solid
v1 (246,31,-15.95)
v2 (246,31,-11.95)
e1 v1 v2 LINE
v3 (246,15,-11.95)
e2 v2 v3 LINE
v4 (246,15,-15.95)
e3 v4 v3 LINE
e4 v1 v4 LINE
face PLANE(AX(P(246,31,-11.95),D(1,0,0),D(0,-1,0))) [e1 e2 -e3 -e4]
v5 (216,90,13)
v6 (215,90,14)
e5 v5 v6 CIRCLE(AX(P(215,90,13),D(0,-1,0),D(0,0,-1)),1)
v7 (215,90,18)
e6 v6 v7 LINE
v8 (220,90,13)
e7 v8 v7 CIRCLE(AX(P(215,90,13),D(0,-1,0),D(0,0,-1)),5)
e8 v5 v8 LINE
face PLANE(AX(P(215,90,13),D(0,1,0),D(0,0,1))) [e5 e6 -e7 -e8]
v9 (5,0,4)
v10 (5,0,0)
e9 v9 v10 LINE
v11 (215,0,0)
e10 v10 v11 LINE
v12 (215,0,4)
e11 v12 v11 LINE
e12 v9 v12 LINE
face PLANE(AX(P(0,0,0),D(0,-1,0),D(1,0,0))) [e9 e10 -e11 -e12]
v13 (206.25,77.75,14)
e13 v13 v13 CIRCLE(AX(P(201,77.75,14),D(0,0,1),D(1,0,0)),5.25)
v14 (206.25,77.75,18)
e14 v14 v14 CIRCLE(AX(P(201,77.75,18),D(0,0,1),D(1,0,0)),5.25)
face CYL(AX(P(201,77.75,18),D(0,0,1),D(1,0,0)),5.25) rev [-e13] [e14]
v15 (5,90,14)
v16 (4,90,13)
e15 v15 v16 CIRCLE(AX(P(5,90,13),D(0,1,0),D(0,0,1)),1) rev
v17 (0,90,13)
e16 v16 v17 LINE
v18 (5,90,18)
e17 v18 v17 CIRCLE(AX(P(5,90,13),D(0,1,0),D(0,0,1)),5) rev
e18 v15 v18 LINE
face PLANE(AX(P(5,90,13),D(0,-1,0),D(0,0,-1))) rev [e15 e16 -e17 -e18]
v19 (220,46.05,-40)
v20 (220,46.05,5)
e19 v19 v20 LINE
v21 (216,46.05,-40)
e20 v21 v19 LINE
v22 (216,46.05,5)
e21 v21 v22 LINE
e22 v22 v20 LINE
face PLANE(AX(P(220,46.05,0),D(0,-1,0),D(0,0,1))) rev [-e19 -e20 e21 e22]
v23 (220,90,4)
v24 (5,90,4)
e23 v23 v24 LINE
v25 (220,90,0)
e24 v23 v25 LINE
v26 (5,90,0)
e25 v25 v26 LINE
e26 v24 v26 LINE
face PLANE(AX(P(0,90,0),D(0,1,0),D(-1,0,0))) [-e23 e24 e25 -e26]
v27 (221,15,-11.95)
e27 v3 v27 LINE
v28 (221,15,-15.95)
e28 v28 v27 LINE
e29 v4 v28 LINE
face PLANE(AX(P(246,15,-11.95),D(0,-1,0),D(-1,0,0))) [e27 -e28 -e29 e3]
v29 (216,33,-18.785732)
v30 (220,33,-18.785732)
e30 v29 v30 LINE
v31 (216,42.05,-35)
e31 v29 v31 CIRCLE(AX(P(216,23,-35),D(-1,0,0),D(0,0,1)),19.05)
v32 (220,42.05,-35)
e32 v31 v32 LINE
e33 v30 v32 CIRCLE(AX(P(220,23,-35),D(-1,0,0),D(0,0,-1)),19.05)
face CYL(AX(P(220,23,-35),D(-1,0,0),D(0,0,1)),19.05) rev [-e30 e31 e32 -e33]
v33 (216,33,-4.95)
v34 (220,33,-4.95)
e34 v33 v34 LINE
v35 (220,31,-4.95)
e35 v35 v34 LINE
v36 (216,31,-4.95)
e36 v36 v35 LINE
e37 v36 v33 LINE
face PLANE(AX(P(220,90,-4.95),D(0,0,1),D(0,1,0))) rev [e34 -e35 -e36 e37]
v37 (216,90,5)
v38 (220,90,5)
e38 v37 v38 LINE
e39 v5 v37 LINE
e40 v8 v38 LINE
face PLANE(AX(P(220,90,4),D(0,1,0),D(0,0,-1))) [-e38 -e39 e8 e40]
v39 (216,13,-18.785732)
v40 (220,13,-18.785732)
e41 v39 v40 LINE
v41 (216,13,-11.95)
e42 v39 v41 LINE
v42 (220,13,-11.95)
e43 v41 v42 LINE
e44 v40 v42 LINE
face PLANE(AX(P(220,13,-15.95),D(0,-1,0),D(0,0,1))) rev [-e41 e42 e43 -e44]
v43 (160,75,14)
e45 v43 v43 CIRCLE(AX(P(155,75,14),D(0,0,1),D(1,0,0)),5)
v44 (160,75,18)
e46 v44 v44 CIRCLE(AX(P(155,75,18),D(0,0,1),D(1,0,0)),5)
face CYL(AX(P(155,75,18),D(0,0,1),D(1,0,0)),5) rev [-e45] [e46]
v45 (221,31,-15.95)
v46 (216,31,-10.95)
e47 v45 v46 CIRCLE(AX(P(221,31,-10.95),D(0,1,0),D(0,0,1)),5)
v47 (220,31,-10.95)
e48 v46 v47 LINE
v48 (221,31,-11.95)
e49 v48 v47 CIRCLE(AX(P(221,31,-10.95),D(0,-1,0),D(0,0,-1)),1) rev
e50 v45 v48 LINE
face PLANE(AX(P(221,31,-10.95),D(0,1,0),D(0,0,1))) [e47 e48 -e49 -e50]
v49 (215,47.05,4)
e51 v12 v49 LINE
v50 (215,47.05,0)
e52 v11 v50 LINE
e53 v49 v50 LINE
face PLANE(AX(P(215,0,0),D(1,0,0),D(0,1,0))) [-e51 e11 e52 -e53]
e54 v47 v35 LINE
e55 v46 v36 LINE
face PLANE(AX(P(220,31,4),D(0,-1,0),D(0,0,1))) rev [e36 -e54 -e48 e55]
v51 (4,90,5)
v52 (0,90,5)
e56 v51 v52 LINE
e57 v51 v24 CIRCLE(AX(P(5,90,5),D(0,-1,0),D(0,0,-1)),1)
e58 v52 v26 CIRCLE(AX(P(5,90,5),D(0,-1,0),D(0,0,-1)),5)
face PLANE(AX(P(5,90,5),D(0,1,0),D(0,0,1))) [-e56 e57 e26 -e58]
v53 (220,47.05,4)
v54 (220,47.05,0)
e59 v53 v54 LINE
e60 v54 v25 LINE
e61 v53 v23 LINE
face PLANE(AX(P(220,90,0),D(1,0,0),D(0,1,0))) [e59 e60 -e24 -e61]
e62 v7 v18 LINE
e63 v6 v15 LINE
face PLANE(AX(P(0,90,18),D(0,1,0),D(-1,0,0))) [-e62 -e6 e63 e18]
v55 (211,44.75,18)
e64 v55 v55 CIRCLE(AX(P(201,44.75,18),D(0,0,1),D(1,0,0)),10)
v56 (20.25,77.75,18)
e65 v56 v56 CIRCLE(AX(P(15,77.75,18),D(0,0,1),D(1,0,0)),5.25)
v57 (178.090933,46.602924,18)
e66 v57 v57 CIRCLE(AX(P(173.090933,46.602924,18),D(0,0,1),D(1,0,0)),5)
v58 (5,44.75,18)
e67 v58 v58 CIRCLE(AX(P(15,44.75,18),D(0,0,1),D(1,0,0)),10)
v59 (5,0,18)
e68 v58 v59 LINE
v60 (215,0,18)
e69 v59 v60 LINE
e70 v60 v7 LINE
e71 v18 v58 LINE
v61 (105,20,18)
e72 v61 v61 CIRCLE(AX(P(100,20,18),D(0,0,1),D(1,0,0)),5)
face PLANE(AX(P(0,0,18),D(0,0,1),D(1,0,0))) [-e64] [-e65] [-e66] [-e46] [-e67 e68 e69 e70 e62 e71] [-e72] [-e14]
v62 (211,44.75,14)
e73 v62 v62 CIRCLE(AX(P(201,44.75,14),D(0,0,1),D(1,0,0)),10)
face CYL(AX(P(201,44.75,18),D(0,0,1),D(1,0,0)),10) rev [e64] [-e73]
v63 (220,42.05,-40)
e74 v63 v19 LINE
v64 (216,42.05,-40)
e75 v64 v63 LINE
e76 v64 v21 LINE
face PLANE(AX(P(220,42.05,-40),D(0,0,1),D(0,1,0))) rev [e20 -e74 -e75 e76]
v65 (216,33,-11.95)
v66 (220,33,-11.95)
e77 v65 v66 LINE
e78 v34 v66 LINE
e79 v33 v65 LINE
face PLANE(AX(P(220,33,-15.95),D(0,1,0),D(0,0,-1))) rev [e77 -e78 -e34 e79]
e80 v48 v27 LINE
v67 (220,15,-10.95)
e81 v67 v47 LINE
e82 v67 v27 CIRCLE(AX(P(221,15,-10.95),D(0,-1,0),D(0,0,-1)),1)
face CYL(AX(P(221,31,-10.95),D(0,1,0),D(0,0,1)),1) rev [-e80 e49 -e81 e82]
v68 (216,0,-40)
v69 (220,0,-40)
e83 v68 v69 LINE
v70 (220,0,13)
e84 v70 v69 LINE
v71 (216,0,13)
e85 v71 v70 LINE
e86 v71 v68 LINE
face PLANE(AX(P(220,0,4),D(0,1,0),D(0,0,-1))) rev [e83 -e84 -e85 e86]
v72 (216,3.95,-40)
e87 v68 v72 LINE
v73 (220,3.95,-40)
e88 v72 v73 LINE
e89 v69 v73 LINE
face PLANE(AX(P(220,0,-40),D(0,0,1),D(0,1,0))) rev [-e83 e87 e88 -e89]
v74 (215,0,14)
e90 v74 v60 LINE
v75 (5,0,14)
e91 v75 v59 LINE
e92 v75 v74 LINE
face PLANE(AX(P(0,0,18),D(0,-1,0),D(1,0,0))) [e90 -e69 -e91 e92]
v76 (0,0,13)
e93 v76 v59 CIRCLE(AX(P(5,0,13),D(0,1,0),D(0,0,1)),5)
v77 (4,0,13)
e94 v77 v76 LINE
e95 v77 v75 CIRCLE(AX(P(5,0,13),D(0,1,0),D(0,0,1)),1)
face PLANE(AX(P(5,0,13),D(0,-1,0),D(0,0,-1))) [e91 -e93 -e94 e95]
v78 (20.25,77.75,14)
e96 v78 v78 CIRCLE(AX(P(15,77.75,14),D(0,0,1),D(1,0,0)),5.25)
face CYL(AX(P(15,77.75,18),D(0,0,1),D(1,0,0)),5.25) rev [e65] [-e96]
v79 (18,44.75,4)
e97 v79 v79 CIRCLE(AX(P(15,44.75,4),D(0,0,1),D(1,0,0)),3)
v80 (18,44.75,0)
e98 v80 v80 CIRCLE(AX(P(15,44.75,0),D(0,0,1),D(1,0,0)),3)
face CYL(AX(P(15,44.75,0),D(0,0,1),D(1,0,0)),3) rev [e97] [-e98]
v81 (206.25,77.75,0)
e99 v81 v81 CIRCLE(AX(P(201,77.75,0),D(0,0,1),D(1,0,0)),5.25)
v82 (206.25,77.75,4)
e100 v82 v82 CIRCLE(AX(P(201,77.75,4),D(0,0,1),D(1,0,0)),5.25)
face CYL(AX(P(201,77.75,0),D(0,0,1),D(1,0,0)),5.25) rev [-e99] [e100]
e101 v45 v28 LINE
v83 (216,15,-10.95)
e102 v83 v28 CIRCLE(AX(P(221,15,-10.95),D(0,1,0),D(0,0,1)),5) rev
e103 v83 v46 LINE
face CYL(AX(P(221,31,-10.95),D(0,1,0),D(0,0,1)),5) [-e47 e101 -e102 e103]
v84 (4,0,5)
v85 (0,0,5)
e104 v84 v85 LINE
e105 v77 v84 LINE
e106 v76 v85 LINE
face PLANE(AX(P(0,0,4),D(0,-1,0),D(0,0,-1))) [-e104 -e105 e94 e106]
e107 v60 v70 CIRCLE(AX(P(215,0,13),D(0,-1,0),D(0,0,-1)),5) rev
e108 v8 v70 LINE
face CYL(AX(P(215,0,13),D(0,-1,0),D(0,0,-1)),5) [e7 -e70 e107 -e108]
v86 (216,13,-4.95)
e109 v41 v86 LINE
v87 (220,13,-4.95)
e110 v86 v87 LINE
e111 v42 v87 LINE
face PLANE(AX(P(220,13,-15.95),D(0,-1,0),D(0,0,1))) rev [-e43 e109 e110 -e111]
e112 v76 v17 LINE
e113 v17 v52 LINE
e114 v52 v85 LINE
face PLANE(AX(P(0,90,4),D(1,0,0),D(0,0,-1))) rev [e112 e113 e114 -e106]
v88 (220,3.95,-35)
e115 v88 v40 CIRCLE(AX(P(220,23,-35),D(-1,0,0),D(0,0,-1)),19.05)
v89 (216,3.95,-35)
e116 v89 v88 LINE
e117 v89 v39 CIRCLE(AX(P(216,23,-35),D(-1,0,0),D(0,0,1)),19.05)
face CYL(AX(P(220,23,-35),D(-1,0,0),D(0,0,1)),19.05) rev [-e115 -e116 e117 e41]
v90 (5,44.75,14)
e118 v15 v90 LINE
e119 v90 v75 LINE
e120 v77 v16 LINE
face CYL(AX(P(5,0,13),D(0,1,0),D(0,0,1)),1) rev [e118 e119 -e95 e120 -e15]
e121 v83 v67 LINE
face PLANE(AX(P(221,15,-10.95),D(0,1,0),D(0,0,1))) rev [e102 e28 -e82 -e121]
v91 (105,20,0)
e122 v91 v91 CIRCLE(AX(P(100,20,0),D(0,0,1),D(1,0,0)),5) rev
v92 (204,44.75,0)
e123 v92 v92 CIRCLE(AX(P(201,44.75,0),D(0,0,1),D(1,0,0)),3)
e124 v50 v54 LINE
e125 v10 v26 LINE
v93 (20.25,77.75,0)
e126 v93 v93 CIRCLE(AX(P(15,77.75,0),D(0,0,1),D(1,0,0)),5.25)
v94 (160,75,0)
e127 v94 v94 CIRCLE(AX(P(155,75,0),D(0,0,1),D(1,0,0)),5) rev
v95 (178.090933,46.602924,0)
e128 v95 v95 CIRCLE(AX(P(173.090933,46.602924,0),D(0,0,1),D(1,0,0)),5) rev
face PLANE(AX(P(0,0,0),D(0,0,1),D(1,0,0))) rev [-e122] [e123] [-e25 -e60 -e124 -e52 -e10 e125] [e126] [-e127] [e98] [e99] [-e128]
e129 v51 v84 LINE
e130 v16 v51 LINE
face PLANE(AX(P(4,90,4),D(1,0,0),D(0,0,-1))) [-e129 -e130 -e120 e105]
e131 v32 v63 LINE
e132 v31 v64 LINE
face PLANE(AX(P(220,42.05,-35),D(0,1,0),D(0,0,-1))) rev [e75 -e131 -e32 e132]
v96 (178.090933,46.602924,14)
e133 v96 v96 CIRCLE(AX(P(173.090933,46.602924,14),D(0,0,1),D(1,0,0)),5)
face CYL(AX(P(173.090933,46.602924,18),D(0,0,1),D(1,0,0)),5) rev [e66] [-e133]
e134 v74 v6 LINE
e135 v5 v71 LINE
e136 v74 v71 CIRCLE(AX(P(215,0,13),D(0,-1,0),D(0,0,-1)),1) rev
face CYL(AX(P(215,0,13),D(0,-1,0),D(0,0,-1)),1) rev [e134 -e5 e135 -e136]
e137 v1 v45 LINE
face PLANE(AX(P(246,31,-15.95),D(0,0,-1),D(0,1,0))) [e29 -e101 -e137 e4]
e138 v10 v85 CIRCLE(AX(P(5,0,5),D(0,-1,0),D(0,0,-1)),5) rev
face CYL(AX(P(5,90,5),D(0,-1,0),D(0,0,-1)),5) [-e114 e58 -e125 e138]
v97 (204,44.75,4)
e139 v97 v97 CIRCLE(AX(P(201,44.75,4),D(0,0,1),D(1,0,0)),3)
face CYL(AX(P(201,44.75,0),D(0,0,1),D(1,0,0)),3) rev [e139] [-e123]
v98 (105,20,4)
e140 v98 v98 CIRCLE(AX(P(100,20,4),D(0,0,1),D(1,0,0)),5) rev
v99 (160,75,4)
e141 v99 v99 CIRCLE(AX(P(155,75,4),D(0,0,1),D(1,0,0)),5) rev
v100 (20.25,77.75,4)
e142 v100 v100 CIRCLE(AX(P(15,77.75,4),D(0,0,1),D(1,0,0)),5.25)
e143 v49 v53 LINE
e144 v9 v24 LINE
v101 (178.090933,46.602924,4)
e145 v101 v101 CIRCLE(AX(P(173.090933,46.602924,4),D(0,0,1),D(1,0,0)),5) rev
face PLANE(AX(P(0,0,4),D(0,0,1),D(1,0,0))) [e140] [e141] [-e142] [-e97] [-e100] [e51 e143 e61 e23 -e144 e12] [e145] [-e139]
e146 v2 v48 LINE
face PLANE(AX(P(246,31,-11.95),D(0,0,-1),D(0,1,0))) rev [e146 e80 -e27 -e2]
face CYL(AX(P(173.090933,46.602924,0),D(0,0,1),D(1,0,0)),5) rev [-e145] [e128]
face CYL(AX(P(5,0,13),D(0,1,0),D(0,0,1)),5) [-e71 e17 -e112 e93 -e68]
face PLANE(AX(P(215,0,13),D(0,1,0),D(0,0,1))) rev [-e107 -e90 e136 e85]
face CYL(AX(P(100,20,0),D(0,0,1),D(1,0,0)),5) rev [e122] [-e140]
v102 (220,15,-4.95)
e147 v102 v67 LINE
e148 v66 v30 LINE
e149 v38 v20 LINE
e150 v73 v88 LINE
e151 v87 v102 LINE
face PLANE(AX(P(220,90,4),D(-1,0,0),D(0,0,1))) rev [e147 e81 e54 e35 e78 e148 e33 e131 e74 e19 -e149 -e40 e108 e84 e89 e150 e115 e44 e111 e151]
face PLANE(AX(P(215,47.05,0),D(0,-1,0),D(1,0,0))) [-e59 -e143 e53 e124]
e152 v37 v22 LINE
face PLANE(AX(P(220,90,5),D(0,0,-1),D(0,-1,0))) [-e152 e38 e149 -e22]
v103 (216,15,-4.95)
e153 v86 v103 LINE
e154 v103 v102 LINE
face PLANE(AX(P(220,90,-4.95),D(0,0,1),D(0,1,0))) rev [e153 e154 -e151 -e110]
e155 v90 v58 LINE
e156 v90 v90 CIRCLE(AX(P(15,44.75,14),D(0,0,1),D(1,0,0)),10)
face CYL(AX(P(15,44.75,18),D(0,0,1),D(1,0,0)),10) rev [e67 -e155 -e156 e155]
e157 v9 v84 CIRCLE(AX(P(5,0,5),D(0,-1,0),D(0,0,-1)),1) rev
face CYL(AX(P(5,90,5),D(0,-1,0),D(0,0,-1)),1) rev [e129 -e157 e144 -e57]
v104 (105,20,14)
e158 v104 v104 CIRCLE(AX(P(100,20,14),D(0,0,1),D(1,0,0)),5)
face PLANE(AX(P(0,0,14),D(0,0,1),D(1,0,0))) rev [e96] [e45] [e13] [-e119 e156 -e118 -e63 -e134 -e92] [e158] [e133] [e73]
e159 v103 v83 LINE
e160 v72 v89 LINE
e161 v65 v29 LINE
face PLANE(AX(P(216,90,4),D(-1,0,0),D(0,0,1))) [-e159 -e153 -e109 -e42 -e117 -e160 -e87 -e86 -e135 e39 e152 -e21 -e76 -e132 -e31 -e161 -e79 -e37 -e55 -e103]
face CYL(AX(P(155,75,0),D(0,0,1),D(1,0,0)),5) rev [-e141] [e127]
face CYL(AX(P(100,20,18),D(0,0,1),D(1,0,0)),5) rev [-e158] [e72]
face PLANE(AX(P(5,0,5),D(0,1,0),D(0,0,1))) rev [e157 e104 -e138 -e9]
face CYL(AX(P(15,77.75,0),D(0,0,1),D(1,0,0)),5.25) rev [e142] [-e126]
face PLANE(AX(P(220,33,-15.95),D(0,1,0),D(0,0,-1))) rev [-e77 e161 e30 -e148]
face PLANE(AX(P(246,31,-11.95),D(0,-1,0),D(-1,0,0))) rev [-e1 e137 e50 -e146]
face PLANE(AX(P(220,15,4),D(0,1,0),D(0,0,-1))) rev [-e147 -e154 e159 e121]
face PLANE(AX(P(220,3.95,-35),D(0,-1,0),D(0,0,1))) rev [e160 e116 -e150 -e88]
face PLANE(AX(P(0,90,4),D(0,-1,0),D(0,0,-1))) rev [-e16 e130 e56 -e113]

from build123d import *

# Parameters (mm, degrees)
SKETCH1_W              = 220
SKETCH1_H              = 90
SKETCH1_R              = 3
SKETCH1_R_2            = 5.25
BOSS_EXTRUDE1_DEPTH    = 4
SKETCH3_W              = 4
SKETCH3_H              = 90
BOSS_EXTRUDE2_DEPTH    = 10
SKETCH21_W             = 220
SKETCH21_H             = 90
SKETCH21_R             = 5.25
SKETCH21_R_2           = 10
SKETCH21_R_3           = 5
BOSS_EXTRUDE3_DEPTH    = 4
CUT_EXTRUDE4_REACH     = 240.109
SKETCH35_R             = 5
BOSS_EXTRUDE6_DEPTH    = 4
SKETCH33_W             = 1
SKETCH33_H             = 43.95
CUT_EXTRUDE2_DEPTH     = 4
CUT_EXTRUDE3_DEPTH     = 4
SKETCH41_W             = 4
SKETCH41_H             = 16
BOSS_EXTRUDE8_DEPTH    = 26
CONVERT_SOLID4_DEPTH   = 90
CONVERT_SOLID4_START   = 13
CONVERT_SOLID4_2_DEPTH = 20
CONVERT_SOLID4_3_DEPTH = 2
CONVERT_SOLID4_START_2 = 31
CONVERT_SOLID4_4_DEPTH = 2
CONVERT_SOLID4_5_DEPTH = 90
CONVERT_SOLID4_START_3 = 15
CONVERT_SOLID4_6_DEPTH = 16


# Read off the part's stored shape, not the designer's step: Convert-Solid4
with BuildPart() as part:
    # Sketch1 → Boss-Extrude1 (new body)
    with BuildSketch(Plane.XY):
        with Locations((110, 45)):
            Rectangle(SKETCH1_W, SKETCH1_H)
        with Locations((201, 44.75)):
            Circle(SKETCH1_R, mode=Mode.SUBTRACT)
        with Locations((201, 77.75)):
            Circle(SKETCH1_R_2, mode=Mode.SUBTRACT)
        with Locations((15, 44.75)):
            Circle(SKETCH1_R, mode=Mode.SUBTRACT)
        with Locations((15, 77.75)):
            Circle(SKETCH1_R_2, mode=Mode.SUBTRACT)
    extrude(amount=BOSS_EXTRUDE1_DEPTH)

    # Sketch3 → Boss-Extrude2 (add)
    with BuildSketch(Plane.XY.offset(4)):
        with Locations((2, 45)):
            Rectangle(SKETCH3_W, SKETCH3_H)
        with Locations((218, 45)):
            Rectangle(SKETCH3_W, SKETCH3_H)
    extrude(amount=BOSS_EXTRUDE2_DEPTH)

    # Sketch21 → Boss-Extrude3 (add)
    with BuildSketch(Plane.XY.offset(14)):
        with Locations((110, 45)):
            Rectangle(SKETCH21_W, SKETCH21_H)
        with Locations((201, 77.75)):
            Circle(SKETCH21_R, mode=Mode.SUBTRACT)
        with Locations((15, 77.75)):
            Circle(SKETCH21_R, mode=Mode.SUBTRACT)
        with Locations((15, 44.75)):
            Circle(SKETCH21_R_2, mode=Mode.SUBTRACT)
        with Locations((201, 44.75)):
            Circle(SKETCH21_R_2, mode=Mode.SUBTRACT)
        with Locations((100, 20)):
            Circle(SKETCH21_R_3, mode=Mode.SUBTRACT)
        with Locations((173.090932683, 46.602923891)):
            Circle(SKETCH21_R_3, mode=Mode.SUBTRACT)
        with Locations((155, 75)):
            Circle(SKETCH21_R_3, mode=Mode.SUBTRACT)
    extrude(amount=BOSS_EXTRUDE3_DEPTH)

    # Sketch35 → Cut-Extrude4 (cut, up to next)
    with BuildSketch(Plane.XY.offset(4), mode=Mode.PRIVATE) as cut_extrude4_sk1:
        with Locations((100, 20)):
            Circle(SKETCH35_R)
    cut_extrude4_tool1 = extrude(cut_extrude4_sk1.sketch, amount=-CUT_EXTRUDE4_REACH, mode=Mode.PRIVATE) & part.part
    # Sketch35 → Cut-Extrude4 (cut, up to next)
    with BuildSketch(Plane.XY.offset(4), mode=Mode.PRIVATE) as cut_extrude4_sk2:
        with Locations((173.090932683, 46.602923891)):
            Circle(SKETCH35_R)
    cut_extrude4_tool2 = extrude(cut_extrude4_sk2.sketch, amount=-CUT_EXTRUDE4_REACH, mode=Mode.PRIVATE) & part.part
    # Sketch35 → Cut-Extrude4 (cut, up to next)
    with BuildSketch(Plane.XY.offset(4), mode=Mode.PRIVATE) as cut_extrude4_sk3:
        with Locations((155, 75)):
            Circle(SKETCH35_R)
    cut_extrude4_tool3 = extrude(cut_extrude4_sk3.sketch, amount=-CUT_EXTRUDE4_REACH, mode=Mode.PRIVATE) & part.part
    add(cut_extrude4_tool1.solids().sort_by_distance((100, 20, 4))[0], mode=Mode.SUBTRACT)
    add(cut_extrude4_tool2.solids().sort_by_distance((173.090933, 46.602924, 4))[0], mode=Mode.SUBTRACT)
    add(cut_extrude4_tool3.solids().sort_by_distance((155, 75, 4))[0], mode=Mode.SUBTRACT)

    # Sketch24 → Boss-Extrude6 (add)
    with BuildSketch(Plane(origin=(220, 0, 0), x_dir=(0, 0, -1), z_dir=(1, 0, 0))):
        with BuildLine():
            Line((40, 42.05), (40, 46.05))
            Line((40, 46.05), (0, 46.05))
            Line((0, 46.05), (0, 0))
            Line((0, 0), (40, 0))
            Line((40, 0), (40, 3.95))
            Line((40, 3.95), (35, 3.95))
            ThreePointArc((35, 3.95), (25.715537172, 6.365660518), (18.785731592, 13))
            Line((18.785731592, 13), (15.95, 13))
            Line((15.95, 13), (15.95, 33))
            Line((15.95, 33), (18.785731592, 33))
            ThreePointArc((18.785731592, 33), (25.715537172, 39.634339482), (35, 42.05))
            Line((35, 42.05), (40, 42.05))
        make_face()
    extrude(amount=-BOSS_EXTRUDE6_DEPTH)

    # Sketch33 → Cut-Extrude2 (cut)
    with BuildSketch(Plane(origin=(220, 0, 0), x_dir=(0, 0, -1), z_dir=(1, 0, 0))):
        with Locations((-4.5, 68.025)):
            Rectangle(SKETCH33_W, SKETCH33_H)
    extrude(amount=-CUT_EXTRUDE2_DEPTH, mode=Mode.SUBTRACT)

    # Sketch34 → Cut-Extrude3 (cut)
    with BuildSketch(Plane(origin=(0, 0, 0), x_dir=(-1, 0, 0), z_dir=(0, 0, -1))):
        Polygon((-216, 0), (-215, 0), (-215, 47.05), (-220, 47.05), (-220, 46.05), (-216, 46.05), align=None)
    extrude(amount=-CUT_EXTRUDE3_DEPTH, mode=Mode.SUBTRACT)

    # Sketch41 → Boss-Extrude8 (add)
    with BuildSketch(Plane(origin=(220, 0, 0), x_dir=(0, 0, -1), z_dir=(1, 0, 0))):
        with Locations((13.95, 23)):
            Rectangle(SKETCH41_W, SKETCH41_H)
    extrude(amount=BOSS_EXTRUDE8_DEPTH)

    # Convert-Solid4 outline → Convert-Solid4 (cut)
    with BuildSketch(Plane(origin=(0, 0, 0), x_dir=(1, 0, 0), z_dir=(0, 1, 0))):
        with BuildLine():
            Line((220, 15.95), (220, 15.848979486))
            ThreePointArc((220, 15.848979486), (220.49745519, 15.924680765), (221, 15.95))
            Line((221, 15.95), (220, 15.95))
        make_face()
        with BuildLine():
            ThreePointArc((0, -5), (1.464466094, -1.464466094), (5, 0))
            Line((5, 0), (0, 0))
            Line((0, 0), (0, -5))
        make_face()
        with BuildLine():
            Line((220, -18), (220, -13))
            ThreePointArc((220, -13), (218.535533906, -16.535533906), (215, -18))
            Line((215, -18), (220, -18))
        make_face()
        with BuildLine():
            ThreePointArc((5, -18), (1.464466094, -16.535533906), (0, -13))
            Line((0, -13), (0, -18))
            Line((0, -18), (5, -18))
        make_face()
    extrude(amount=CONVERT_SOLID4_DEPTH, mode=Mode.SUBTRACT)

    # Convert-Solid4 2 outline → Convert-Solid4 2 (cut)
    with BuildSketch(Plane(origin=(0, 0, 0), x_dir=(1, 0, 0), z_dir=(0, 1, 0)).offset(CONVERT_SOLID4_START)):
        with BuildLine():
            Line((216, 15.95), (216, 10.95))
            ThreePointArc((216, 10.95), (217.127016654, 14.11227766), (220, 15.848979486))
            Line((220, 15.848979486), (220, 15.95))
            Line((220, 15.95), (216, 15.95))
        make_face()
    extrude(amount=CONVERT_SOLID4_2_DEPTH, mode=Mode.SUBTRACT)

    # Convert-Solid4 3 outline → Convert-Solid4 3 (cut)
    with BuildSketch(Plane(origin=(0, 0, 0), x_dir=(1, 0, 0), z_dir=(0, 1, 0)).offset(CONVERT_SOLID4_START)):
        with BuildLine():
            Line((216, 10.95), (216, 4.95))
            Line((216, 4.95), (220, 4.95))
            Line((220, 4.95), (220, 15.848979486))
            ThreePointArc((220, 15.848979486), (217.127016654, 14.11227766), (216, 10.95))
        make_face()
    extrude(amount=CONVERT_SOLID4_3_DEPTH, mode=Mode.SUBTRACT)

    # Convert-Solid4 4 outline → Convert-Solid4 4 (cut)
    with BuildSketch(Plane(origin=(0, 0, 0), x_dir=(1, 0, 0), z_dir=(0, 1, 0)).offset(CONVERT_SOLID4_START_2)):
        with BuildLine():
            Line((216, 10.95), (216, 4.95))
            Line((216, 4.95), (220, 4.95))
            Line((220, 4.95), (220, 15.848979486))
            ThreePointArc((220, 15.848979486), (217.127016654, 14.11227766), (216, 10.95))
        make_face()
    extrude(amount=CONVERT_SOLID4_4_DEPTH, mode=Mode.SUBTRACT)

    # Convert-Solid4 5 outline → Convert-Solid4 5 (add)
    with BuildSketch(Plane(origin=(0, 0, 0), x_dir=(1, 0, 0), z_dir=(0, 1, 0))):
        with BuildLine():
            Line((216, -14), (216, -13))
            ThreePointArc((216, -13), (215.707106781, -13.707106781), (215, -14))
            Line((215, -14), (216, -14))
        make_face()
        with BuildLine():
            ThreePointArc((4, -5), (4.292893219, -4.292893219), (5, -4))
            Line((5, -4), (4, -4))
            Line((4, -4), (4, -5))
        make_face()
        with BuildLine():
            Line((4, -14), (5, -14))
            ThreePointArc((5, -14), (4.292893219, -13.707106781), (4, -13))
            Line((4, -13), (4, -14))
        make_face()
    extrude(amount=CONVERT_SOLID4_5_DEPTH)

    # Convert-Solid4 6 outline → Convert-Solid4 6 (add)
    with BuildSketch(Plane(origin=(0, 0, 0), x_dir=(1, 0, 0), z_dir=(0, 1, 0)).offset(CONVERT_SOLID4_START_3)):
        with BuildLine():
            Line((220, 11.95), (220, 10.95))
            ThreePointArc((220, 10.95), (220.292893219, 11.657106781), (221, 11.95))
            Line((221, 11.95), (220, 11.95))
        make_face()
    extrude(amount=CONVERT_SOLID4_6_DEPTH)


solid = part.part
